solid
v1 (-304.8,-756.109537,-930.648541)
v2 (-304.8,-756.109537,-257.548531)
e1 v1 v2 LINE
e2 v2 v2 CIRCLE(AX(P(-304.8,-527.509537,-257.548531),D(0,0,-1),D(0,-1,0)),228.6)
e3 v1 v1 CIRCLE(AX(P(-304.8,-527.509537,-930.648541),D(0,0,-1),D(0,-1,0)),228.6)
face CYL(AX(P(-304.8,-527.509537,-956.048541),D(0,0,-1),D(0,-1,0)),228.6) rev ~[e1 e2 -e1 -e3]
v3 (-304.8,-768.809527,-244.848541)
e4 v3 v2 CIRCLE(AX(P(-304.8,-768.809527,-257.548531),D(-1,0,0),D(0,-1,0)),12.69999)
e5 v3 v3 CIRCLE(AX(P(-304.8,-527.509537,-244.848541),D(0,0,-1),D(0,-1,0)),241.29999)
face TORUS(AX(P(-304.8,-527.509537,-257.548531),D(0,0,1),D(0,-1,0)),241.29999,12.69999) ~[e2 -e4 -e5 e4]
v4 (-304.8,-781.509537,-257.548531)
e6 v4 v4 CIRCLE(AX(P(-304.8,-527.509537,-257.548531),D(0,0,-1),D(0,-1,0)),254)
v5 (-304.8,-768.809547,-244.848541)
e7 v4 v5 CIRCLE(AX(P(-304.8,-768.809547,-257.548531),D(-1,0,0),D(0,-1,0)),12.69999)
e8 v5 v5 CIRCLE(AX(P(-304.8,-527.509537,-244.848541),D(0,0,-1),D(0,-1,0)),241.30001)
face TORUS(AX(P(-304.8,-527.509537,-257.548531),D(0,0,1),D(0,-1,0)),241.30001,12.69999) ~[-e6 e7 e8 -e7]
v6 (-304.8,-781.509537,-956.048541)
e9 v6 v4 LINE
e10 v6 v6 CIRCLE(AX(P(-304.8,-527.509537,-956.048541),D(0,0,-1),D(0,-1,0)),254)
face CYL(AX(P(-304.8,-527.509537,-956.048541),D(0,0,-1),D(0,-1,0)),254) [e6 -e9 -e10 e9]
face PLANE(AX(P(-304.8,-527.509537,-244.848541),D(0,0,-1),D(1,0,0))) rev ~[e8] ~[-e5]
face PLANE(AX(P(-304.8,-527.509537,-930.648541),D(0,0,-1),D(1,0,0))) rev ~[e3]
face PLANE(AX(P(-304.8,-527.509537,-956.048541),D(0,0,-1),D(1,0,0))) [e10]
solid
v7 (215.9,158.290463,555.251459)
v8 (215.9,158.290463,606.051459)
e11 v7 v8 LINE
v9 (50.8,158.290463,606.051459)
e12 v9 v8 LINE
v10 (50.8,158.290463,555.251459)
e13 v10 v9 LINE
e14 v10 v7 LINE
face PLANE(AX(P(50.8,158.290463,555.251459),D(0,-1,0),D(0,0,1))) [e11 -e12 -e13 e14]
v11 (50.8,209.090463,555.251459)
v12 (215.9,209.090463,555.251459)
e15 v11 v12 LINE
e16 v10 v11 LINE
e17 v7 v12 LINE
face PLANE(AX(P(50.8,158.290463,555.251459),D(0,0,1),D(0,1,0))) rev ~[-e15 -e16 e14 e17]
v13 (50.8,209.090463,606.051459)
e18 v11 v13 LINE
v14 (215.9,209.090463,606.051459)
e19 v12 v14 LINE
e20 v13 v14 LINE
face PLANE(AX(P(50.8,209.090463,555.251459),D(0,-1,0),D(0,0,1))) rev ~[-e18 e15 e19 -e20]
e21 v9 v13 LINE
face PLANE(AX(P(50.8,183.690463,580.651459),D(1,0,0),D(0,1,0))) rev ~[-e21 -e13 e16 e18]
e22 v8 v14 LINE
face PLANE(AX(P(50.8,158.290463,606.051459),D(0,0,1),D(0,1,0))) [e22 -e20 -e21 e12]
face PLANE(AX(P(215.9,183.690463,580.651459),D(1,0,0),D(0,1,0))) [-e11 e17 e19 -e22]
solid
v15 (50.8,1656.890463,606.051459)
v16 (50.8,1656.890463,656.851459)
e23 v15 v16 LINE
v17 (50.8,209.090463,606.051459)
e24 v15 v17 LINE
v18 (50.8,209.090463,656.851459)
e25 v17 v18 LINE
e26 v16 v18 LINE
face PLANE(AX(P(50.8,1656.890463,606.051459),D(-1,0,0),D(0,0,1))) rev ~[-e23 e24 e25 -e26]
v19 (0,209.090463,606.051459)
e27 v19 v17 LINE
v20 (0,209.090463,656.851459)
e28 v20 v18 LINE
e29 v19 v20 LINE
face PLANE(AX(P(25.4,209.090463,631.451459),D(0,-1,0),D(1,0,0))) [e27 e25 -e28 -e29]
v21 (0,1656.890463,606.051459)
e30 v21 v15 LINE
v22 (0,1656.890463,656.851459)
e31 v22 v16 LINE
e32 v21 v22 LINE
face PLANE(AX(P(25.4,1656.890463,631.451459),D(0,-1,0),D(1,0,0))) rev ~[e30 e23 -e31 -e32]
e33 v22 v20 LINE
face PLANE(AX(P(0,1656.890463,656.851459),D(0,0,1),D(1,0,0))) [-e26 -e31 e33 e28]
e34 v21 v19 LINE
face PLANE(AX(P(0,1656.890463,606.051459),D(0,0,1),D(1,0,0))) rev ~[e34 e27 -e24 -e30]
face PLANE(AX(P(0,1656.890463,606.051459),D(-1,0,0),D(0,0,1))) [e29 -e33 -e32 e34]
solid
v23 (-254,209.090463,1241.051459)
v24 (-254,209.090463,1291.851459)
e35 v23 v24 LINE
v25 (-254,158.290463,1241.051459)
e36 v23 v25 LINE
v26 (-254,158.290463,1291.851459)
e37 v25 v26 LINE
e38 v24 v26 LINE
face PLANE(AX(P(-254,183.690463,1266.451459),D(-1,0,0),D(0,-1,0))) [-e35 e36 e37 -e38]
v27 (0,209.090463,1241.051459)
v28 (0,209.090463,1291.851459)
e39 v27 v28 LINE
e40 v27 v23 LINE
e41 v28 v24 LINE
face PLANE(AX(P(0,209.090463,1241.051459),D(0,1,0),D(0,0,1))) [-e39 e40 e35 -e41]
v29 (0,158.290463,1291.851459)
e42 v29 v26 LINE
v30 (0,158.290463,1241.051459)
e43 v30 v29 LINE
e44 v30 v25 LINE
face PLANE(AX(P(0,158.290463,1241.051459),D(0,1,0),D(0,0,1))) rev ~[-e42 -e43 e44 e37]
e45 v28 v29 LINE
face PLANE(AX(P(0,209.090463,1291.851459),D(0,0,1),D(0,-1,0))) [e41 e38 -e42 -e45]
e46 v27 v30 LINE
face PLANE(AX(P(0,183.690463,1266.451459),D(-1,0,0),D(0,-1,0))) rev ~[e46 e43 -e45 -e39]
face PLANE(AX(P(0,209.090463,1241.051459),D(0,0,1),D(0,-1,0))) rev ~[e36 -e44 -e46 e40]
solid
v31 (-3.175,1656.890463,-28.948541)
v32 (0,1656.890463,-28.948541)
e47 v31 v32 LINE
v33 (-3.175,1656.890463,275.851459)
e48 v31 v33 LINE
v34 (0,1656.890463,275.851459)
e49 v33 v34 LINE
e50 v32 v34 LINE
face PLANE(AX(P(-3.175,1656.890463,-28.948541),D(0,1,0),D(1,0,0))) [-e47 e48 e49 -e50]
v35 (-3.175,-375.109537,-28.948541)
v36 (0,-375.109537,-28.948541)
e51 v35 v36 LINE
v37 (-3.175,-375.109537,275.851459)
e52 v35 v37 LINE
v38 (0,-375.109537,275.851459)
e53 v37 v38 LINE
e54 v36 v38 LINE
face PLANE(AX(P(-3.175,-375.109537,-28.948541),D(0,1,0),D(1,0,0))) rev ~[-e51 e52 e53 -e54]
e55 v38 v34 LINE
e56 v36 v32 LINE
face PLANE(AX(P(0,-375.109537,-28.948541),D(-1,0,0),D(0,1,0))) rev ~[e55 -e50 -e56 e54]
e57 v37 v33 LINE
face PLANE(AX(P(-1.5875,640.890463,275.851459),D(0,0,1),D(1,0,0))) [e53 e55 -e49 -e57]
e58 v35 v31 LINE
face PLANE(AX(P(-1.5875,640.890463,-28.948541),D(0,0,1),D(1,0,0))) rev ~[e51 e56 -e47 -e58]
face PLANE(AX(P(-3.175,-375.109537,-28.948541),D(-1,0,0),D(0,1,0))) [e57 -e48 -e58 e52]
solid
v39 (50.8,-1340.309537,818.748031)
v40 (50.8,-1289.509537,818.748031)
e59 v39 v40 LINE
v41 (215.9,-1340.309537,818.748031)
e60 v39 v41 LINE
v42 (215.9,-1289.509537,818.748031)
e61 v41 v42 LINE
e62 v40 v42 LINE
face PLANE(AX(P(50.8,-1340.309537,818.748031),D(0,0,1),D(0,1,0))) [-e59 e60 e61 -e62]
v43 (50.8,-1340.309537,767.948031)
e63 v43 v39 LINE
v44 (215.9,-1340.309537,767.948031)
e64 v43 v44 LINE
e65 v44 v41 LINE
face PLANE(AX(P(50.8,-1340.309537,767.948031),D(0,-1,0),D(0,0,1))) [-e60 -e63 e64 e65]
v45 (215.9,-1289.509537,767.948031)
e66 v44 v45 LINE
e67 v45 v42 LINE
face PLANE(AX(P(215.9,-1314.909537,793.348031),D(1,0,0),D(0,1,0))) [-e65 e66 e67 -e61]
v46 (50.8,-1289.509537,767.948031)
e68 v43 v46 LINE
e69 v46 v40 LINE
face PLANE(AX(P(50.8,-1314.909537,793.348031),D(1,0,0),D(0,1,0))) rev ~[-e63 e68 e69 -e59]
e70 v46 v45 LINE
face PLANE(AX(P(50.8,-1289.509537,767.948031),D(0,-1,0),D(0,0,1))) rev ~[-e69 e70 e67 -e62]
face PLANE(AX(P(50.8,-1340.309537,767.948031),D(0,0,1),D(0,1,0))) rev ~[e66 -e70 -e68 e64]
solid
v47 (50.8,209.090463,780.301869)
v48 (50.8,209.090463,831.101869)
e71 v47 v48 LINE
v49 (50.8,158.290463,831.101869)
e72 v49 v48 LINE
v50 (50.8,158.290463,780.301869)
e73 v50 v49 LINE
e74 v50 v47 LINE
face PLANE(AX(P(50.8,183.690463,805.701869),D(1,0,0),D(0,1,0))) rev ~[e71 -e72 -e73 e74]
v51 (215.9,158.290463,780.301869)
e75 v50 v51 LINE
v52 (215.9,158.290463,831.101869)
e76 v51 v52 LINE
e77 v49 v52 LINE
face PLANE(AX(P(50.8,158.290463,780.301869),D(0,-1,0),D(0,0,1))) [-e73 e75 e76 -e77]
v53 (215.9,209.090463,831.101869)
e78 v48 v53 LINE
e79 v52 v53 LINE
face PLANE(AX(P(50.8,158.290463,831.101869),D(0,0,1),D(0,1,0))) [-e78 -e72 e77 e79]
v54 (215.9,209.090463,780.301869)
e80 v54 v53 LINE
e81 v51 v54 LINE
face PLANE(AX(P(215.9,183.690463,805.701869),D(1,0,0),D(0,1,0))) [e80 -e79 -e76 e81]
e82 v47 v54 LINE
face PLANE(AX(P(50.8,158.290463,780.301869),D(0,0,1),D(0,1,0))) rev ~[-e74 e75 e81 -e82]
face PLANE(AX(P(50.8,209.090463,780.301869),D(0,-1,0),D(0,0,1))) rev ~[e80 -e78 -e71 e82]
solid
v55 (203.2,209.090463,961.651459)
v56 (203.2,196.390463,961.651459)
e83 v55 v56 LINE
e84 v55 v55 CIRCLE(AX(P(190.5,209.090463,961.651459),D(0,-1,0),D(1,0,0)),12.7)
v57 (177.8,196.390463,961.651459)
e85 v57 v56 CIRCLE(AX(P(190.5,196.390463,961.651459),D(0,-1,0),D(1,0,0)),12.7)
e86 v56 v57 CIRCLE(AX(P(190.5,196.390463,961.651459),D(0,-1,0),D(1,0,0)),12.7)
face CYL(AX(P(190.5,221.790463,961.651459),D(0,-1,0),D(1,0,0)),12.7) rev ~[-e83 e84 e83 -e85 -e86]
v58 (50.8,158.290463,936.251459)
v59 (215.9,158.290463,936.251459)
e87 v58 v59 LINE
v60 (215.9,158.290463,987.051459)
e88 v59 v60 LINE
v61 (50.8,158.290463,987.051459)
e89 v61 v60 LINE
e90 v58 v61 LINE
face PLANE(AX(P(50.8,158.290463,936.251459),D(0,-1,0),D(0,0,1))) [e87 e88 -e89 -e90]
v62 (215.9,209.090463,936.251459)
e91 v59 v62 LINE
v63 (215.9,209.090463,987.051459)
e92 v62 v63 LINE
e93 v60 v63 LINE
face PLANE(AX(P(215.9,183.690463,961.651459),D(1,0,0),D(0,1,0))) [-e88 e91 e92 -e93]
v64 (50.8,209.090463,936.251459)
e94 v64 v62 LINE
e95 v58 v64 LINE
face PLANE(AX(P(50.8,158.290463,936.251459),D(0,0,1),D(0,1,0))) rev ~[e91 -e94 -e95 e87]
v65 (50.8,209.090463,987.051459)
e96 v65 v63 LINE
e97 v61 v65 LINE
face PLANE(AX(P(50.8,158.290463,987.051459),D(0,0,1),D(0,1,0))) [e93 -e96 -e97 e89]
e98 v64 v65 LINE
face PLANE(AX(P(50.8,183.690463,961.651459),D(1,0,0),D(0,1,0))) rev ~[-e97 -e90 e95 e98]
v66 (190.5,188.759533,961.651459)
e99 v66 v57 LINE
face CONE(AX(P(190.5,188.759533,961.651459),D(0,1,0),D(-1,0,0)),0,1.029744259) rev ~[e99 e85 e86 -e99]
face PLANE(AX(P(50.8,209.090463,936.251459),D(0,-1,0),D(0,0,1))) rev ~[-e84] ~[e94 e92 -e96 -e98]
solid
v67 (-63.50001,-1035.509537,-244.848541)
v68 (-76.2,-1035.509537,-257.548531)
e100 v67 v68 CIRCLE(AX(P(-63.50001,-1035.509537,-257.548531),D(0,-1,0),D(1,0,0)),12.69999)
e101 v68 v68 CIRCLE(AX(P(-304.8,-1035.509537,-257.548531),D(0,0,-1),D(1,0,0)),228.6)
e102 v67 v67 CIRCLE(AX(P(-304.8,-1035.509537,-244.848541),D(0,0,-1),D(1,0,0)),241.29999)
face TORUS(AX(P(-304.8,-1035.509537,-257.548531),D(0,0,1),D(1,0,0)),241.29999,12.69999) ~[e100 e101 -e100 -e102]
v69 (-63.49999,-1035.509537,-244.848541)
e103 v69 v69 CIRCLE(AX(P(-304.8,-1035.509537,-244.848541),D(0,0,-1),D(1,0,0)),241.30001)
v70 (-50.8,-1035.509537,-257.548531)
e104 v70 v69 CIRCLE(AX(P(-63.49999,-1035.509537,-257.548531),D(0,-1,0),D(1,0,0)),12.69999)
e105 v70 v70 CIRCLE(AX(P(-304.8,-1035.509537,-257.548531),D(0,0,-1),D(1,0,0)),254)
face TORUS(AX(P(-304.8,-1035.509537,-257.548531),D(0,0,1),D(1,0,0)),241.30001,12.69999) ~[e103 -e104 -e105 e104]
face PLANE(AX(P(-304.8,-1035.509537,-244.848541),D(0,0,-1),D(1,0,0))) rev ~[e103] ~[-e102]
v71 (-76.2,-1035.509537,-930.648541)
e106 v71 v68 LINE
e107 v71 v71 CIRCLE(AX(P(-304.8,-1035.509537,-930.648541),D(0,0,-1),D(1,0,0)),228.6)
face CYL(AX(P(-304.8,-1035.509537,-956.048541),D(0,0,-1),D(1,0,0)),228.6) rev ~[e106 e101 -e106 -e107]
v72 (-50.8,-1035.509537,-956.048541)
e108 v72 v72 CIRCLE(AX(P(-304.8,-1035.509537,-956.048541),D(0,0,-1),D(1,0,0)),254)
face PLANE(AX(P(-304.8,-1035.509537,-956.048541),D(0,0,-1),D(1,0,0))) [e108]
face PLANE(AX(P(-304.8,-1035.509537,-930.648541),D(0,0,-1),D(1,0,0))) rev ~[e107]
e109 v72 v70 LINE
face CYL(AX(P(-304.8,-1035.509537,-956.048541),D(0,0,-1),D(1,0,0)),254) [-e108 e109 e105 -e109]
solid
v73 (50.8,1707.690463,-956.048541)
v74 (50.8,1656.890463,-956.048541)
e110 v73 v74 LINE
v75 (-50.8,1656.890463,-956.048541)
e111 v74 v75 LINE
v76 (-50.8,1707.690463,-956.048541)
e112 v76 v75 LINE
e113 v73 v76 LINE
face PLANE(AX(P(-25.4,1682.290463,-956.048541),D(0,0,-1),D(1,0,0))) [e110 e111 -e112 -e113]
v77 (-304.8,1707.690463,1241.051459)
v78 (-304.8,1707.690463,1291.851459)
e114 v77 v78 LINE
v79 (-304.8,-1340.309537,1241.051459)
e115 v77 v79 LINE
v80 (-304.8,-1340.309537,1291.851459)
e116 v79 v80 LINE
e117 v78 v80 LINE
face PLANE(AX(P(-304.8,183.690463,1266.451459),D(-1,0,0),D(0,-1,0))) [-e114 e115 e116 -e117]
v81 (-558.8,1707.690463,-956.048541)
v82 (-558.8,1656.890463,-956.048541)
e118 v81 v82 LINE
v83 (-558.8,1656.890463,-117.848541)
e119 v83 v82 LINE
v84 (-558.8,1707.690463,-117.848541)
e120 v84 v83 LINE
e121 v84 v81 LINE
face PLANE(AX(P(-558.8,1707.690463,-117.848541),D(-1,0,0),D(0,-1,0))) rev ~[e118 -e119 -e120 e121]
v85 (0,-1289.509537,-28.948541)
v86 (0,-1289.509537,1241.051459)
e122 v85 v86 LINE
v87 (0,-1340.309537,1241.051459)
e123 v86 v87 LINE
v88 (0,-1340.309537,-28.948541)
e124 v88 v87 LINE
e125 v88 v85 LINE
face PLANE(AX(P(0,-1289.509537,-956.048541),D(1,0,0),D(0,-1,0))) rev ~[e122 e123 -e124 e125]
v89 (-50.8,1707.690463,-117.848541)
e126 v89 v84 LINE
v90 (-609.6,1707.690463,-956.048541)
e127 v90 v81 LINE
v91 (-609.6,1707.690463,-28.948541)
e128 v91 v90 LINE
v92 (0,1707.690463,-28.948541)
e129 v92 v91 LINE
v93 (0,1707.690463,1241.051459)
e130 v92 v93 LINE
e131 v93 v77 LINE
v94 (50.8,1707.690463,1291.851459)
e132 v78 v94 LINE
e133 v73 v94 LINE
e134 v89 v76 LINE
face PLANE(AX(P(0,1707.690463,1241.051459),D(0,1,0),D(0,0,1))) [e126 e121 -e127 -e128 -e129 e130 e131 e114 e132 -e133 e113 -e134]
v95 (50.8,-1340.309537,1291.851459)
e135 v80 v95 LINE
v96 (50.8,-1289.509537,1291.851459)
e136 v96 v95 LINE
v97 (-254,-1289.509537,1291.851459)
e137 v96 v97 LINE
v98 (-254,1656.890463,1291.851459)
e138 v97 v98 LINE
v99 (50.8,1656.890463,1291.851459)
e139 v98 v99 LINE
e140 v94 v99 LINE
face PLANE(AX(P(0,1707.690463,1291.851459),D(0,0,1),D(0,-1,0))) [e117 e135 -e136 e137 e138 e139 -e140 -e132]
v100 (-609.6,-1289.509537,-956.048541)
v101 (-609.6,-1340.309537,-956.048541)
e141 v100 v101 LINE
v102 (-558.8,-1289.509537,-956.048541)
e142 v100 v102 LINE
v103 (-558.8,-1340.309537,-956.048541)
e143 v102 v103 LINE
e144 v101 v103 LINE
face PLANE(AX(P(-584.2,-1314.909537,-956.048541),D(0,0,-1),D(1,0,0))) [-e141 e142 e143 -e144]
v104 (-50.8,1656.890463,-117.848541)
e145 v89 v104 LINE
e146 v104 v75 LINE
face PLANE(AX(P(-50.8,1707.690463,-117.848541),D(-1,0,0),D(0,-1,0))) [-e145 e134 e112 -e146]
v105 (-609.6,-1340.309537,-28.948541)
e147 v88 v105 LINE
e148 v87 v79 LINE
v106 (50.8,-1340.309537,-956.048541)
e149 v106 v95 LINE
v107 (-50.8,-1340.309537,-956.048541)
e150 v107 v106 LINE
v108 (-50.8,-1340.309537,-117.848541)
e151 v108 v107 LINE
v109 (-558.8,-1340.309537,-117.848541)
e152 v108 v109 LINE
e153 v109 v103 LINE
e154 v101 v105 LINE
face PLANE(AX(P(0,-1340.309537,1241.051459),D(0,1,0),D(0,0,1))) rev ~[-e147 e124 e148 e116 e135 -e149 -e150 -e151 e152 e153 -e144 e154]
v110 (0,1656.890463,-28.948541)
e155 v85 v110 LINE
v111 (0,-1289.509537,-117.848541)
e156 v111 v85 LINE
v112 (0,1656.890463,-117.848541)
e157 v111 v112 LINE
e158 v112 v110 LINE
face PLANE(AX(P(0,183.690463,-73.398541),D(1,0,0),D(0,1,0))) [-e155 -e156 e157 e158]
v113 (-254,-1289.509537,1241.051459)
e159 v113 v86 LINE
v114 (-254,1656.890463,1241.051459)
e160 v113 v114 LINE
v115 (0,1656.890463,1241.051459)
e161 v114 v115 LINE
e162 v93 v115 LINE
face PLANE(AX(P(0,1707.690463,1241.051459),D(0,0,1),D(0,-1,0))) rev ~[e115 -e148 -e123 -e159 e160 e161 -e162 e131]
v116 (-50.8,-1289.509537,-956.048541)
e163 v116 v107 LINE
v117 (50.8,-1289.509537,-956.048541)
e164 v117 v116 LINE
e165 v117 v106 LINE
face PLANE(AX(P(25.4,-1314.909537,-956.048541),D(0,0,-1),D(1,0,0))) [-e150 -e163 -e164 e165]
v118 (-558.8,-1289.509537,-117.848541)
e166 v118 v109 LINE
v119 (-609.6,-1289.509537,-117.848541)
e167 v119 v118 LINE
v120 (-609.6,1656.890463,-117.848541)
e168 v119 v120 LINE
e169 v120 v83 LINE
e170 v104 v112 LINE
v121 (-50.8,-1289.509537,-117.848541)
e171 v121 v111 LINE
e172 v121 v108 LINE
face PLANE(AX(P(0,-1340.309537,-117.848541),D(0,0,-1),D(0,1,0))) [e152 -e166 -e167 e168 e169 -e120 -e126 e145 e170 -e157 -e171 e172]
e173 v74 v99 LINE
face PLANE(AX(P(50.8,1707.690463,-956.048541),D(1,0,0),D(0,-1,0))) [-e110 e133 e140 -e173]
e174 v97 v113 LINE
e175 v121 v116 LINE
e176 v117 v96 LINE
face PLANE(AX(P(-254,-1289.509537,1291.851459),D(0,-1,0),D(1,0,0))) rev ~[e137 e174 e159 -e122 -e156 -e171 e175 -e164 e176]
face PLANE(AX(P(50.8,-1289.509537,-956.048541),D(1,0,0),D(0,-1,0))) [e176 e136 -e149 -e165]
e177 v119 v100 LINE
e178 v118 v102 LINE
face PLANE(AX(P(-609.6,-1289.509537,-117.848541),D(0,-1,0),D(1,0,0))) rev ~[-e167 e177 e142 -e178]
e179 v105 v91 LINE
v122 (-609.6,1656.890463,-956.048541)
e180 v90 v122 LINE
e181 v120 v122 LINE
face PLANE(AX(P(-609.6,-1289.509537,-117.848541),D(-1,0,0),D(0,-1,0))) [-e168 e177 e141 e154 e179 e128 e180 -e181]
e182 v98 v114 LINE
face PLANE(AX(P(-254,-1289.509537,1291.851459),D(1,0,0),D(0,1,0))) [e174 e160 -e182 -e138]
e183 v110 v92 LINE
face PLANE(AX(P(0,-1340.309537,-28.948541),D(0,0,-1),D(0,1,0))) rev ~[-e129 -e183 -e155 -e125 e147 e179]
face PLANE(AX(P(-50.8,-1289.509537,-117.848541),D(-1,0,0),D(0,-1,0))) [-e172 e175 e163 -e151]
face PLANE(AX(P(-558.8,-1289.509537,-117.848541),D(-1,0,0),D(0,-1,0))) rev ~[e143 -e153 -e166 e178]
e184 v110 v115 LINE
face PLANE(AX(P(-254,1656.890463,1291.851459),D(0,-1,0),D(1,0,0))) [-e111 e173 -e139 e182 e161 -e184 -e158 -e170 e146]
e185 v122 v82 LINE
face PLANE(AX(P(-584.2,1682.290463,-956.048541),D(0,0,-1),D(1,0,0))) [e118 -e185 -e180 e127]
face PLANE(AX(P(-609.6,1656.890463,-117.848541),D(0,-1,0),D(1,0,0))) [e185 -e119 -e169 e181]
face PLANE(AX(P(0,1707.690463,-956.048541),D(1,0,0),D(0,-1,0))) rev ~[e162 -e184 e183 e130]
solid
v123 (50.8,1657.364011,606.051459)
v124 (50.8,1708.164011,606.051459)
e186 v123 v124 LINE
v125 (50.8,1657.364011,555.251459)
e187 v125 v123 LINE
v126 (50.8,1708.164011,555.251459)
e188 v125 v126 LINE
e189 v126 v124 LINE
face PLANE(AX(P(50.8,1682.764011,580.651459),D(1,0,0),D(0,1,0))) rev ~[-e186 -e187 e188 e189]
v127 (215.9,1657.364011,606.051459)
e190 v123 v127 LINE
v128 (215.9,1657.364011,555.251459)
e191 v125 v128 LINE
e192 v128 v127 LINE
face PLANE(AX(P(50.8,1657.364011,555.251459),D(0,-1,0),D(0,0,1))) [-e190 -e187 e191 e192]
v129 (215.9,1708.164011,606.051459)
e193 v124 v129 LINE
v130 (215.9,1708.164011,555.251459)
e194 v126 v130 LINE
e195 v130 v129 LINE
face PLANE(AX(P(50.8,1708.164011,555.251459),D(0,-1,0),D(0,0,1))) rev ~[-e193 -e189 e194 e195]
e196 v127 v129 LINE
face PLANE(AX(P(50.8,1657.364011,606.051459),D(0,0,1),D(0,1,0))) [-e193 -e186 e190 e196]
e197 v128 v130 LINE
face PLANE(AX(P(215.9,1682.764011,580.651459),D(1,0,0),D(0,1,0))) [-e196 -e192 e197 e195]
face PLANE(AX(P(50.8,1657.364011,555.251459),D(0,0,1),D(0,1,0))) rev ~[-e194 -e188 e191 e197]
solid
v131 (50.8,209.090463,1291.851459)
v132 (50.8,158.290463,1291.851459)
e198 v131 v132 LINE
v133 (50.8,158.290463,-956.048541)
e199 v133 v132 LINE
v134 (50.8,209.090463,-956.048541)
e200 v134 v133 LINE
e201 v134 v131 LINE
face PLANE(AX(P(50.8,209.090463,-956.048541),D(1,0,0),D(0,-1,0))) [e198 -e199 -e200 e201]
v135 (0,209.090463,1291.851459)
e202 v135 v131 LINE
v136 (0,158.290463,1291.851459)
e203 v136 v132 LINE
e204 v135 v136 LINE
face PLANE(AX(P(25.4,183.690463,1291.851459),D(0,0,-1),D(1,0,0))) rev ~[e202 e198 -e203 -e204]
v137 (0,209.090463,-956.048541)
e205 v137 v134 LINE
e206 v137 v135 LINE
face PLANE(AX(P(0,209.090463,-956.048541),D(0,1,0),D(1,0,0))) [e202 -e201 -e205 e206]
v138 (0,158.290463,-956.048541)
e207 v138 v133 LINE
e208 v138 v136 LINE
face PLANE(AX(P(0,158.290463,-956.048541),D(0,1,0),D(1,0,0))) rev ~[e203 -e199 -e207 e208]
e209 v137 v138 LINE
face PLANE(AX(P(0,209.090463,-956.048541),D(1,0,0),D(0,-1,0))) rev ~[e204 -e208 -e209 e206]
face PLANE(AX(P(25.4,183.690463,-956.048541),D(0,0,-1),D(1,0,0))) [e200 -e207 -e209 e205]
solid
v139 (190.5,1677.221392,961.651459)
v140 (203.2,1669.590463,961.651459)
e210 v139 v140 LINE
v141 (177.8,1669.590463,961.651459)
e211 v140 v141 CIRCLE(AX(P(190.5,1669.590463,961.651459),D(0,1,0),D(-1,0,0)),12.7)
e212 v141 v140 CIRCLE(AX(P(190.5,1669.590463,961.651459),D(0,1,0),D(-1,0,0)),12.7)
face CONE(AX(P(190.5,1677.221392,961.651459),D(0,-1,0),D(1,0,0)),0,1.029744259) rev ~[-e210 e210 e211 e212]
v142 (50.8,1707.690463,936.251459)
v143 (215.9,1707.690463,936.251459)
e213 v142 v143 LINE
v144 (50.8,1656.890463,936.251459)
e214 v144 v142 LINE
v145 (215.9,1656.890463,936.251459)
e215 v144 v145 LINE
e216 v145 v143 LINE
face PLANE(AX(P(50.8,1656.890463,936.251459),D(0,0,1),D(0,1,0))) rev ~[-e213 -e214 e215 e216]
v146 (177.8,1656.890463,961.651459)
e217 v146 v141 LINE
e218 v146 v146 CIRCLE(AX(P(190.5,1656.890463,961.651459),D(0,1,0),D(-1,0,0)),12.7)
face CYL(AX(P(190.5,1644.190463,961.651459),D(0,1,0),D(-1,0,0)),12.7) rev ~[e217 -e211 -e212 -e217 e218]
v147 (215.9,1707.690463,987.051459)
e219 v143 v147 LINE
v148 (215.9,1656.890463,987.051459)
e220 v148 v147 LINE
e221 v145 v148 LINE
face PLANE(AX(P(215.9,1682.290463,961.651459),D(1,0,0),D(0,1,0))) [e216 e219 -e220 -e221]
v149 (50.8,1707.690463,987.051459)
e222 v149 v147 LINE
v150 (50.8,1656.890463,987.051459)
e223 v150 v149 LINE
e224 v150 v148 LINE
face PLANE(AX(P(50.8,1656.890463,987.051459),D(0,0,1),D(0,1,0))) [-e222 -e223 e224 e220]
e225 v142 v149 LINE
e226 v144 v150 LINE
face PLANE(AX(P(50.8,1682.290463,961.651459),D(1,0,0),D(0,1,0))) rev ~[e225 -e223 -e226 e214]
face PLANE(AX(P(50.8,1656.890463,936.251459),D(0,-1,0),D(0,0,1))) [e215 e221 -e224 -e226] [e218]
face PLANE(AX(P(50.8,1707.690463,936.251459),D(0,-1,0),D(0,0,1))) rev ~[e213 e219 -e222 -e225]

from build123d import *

# Parameters (mm, degrees)
F0_W      = 3048
F0_H      = 88.9
F1_DEPTH  = 609.6
F2_W      = 50.8
F2_H      = 50.8
F3_DEPTH  = 838.2
F5_DEPTH  = 711.2
F6_W      = 50.8
F6_H      = 50.8
F7_DEPTH  = 2247.9
F8_W      = 3048
F8_H      = 50.8
F9_DEPTH  = 304.8
F10_W     = 254
F10_H     = 2946.4
F11_DEPTH = 50.8
F12_W     = 3.175
F12_H     = 2032
F13_DEPTH = 304.8
F14_W     = 50.8
F14_H     = 50.8
F15_DEPTH = 2247.9
F16_T     = -25.4
F17_T     = -25.4
F18_R     = 12.69999
F19_R     = 12.69999
F20_W     = 50.8
F20_H     = 50.8
F21_DEPTH = 1447.8
F22_W     = 50.8
F22_H     = 50.8
F23_DEPTH = 165.1
F24_W     = 50.8
F24_H     = 50.8
F25_DEPTH = 254
F26_W     = 50.8
F26_H     = 50.8
F27_DEPTH = 165.1
F28_W     = 50.8
F28_H     = 50.8
F29_DEPTH = 165.1
F31_D     = 25.4
F31_DEPTH = 12.7
F31_TIP   = 7.6309298617
F33_D     = 25.4
F33_DEPTH = 12.7
F33_TIP   = 7.6309298617


# Not quite as in the source:
# - a fillet or chamfer is up to 0.001 mm smaller than in the source, because OpenCascade refuses the exact size


with BuildPart() as f1:
    # F0 (on Right) → F1 (new body)
    with BuildSketch(Plane.YZ):
        with Locations((183.6904625475, -73.3985408201)):
            Rectangle(F0_W, F0_H)
    extrude(amount=-F1_DEPTH)

    # F2 (on face) → F3 (join)
    with BuildSketch(Plane(origin=(0, 0, -117.8485408201), x_dir=(1, 0, 0), z_dir=(0, 0, -1))):
        with Locations((-584.2, 1314.9095374525)):
            Rectangle(F2_W, F2_H)
        with Locations((-25.4, 1314.9095374525)):
            Rectangle(F2_W, F2_H)
        with Locations((-25.4, -1682.2904625475)):
            Rectangle(F2_W, F2_H)
        with Locations((-584.2, -1682.2904625475)):
            Rectangle(F2_W, F2_H)
    extrude(amount=F3_DEPTH)

    # F6 (on face) → F7 (join)
    with BuildSketch(Plane(origin=(0, 0, -956.0485408201), x_dir=(1, 0, 0), z_dir=(0, 0, -1))):
        with Locations((25.4, 1314.9095374525)):
            Rectangle(F6_W, F6_H)
        with Locations((25.4, -1682.2904625475)):
            Rectangle(F6_W, F6_H)
    extrude(amount=-F7_DEPTH)

    # F8 (on face) → F9 (join)
    with BuildSketch(Plane(origin=(0, 0, 0), x_dir=(0, -1, 0), z_dir=(-1, 0, 0))):
        with Locations((-183.6904625475, 1266.4514591799)):
            Rectangle(F8_W, F8_H)
    extrude(amount=F9_DEPTH)

    # F10 (on face) → F11 (cut, through all)
    with BuildSketch(Plane.XY.offset(1291.8514591799)):
        with Locations((-127, 183.6904625475)):
            Rectangle(F10_W, F10_H)
    extrude(amount=-F11_DEPTH, mode=Mode.SUBTRACT)


with BuildPart() as f5:
    # F4 (on face) → F5 (new body)
    with BuildSketch(Plane(origin=(0, 0, -956.0485408201), x_dir=(1, 0, 0), z_dir=(0, 0, -1))):
        with BuildLine():
            ThreePointArc((-304.8, 781.5095374525), (-125.1948775786, 855.9044150311), (-50.8, 1035.5095374525))
            ThreePointArc((-50.8, 1035.5095374525), (-484.4051224214, 1215.1146598738), (-304.8, 781.5095374525))
        make_face()
    extrude(amount=-F5_DEPTH)

    # F17
    f17_openings = [f5.faces().sort_by_distance(p)[0] for p in [
        (-304.8, -1035.509537, -244.848541),
    ]]
    offset(amount=F17_T, openings=f17_openings)

    # F18 (radius 12.7 in the source; OpenCascade refuses exactly that, so slightly less here)
    f18_edges = [f5.edges().sort_by_distance(p)[0] for p in [
        (-304.8, -1289.509537, -244.848541),
        (-304.8, -1264.109537, -244.848541),
    ]]
    fillet(f18_edges, radius=F18_R)


with BuildPart() as f5b:
    # F4 (on face) → F5, piece 2 (new body)
    with BuildSketch(Plane(origin=(0, 0, -956.0485408201), x_dir=(1, 0, 0), z_dir=(0, 0, -1))):
        with BuildLine():
            ThreePointArc((-50.8, 527.5095374525), (-125.1948775786, 707.1146598738), (-304.8, 781.5095374525))
            ThreePointArc((-304.8, 781.5095374525), (-484.4051224214, 347.9044150311), (-50.8, 527.5095374525))
        make_face()
    extrude(amount=-F5_DEPTH)

    # F16
    f16_openings = [f5b.faces().sort_by_distance(p)[0] for p in [
        (-304.8, -527.509537, -244.848541),
    ]]
    offset(amount=F16_T, openings=f16_openings)

    # F19 (radius 12.7 in the source; OpenCascade refuses exactly that, so slightly less here)
    f19_edges = [f5b.edges().sort_by_distance(p)[0] for p in [
        (-558.8, -527.509537, -244.848541),
        (-533.4, -527.509537, -244.848541),
    ]]
    fillet(f19_edges, radius=F19_R)


with BuildPart() as f13:
    # F12 (on face) → F13 (new body)
    with BuildSketch(Plane.XY.offset(-28.9485408201)):
        with Locations((-1.5875, 640.8904625475)):
            Rectangle(F12_W, F12_H)
    extrude(amount=F13_DEPTH)


with BuildPart() as f15:
    # F14 (on face) → F15 (new body)
    with BuildSketch(Plane(origin=(0, 0, -956.0485408201), x_dir=(1, 0, 0), z_dir=(0, 0, -1))):
        with Locations((25.4, -183.6904625475)):
            Rectangle(F14_W, F14_H)
    extrude(amount=-F15_DEPTH)


with BuildPart() as f21:
    # F20 (on face) → F21 (new body, through all)
    with BuildSketch(Plane.XZ.offset(-1656.8904625475)):
        with Locations((25.4, 631.4514591799)):
            Rectangle(F20_W, F20_H)
    extrude(amount=F21_DEPTH)


with BuildPart() as f23:
    # F22 (on face) → F23 (new body)
    with BuildSketch(Plane.YZ.offset(50.8)):
        with Locations((183.6904625475, 805.7018689156)):
            Rectangle(F22_W, F22_H)
    extrude(amount=F23_DEPTH)


with BuildPart() as f23b:
    # F22 (on face) → F23, piece 2 (new body)
    with BuildSketch(Plane.YZ.offset(50.8)):
        with Locations((-1314.9095374525, 793.3480314255)):
            Rectangle(F22_W, F22_H)
    extrude(amount=F23_DEPTH)


with BuildPart() as f25:
    # F24 (on face) → F25 (new body, through all)
    with BuildSketch(Plane(origin=(0, 0, 0), x_dir=(0, -1, 0), z_dir=(-1, 0, 0))):
        with Locations((-183.6904625475, 1266.4514591799)):
            Rectangle(F24_W, F24_H)
    extrude(amount=F25_DEPTH)


with BuildPart() as f27:
    # F26 (on face) → F27 (new body)
    with BuildSketch(Plane.YZ.offset(50.8)):
        with Locations((183.6904625475, 580.6514591799)):
            Rectangle(F26_W, F26_H)
    extrude(amount=F27_DEPTH)


with BuildPart() as f27b:
    # F26 (on face) → F27, piece 2 (new body)
    with BuildSketch(Plane.YZ.offset(50.8)):
        with Locations((1682.7640108109, 580.6514591799)):
            Rectangle(F26_W, F26_H)
    extrude(amount=F27_DEPTH)


with BuildPart() as f29:
    # F28 (on face) → F29 (new body)
    with BuildSketch(Plane.YZ.offset(50.8)):
        with Locations((183.6904625475, 961.6514591799)):
            Rectangle(F28_W, F28_H)
    extrude(amount=F29_DEPTH)

    # F33
    with Locations(Plane(origin=(0, 209.0904625475, 0), x_dir=(-1, 0, 0), z_dir=(0, 1, 0))):
        with Locations((-190.5, 961.6514591799)):
            Hole(F33_D / 2, depth=F33_DEPTH)
            with Locations((0, 0, -(F33_DEPTH + F33_TIP / 2))):  # 118° drill point
                Cone(0, F33_D / 2, F33_TIP, mode=Mode.SUBTRACT)


with BuildPart() as f29b:
    # F28 (on face) → F29, piece 2 (new body)
    with BuildSketch(Plane.YZ.offset(50.8)):
        with Locations((1682.2904625475, 961.6514591799)):
            Rectangle(F28_W, F28_H)
    extrude(amount=F29_DEPTH)

    # F31
    with Locations(Plane.XZ.offset(-1656.8904625475)):
        with Locations((190.5, 961.6514591799)):
            Hole(F31_D / 2, depth=F31_DEPTH)
            with Locations((0, 0, -(F31_DEPTH + F31_TIP / 2))):  # 118° drill point
                Cone(0, F31_D / 2, F31_TIP, mode=Mode.SUBTRACT)


solid = Compound([f1.part, f5.part, f5b.part, f13.part, f15.part, f21.part, f23.part, f23b.part, f25.part, f27.part, f27b.part, f29.part, f29b.part])
